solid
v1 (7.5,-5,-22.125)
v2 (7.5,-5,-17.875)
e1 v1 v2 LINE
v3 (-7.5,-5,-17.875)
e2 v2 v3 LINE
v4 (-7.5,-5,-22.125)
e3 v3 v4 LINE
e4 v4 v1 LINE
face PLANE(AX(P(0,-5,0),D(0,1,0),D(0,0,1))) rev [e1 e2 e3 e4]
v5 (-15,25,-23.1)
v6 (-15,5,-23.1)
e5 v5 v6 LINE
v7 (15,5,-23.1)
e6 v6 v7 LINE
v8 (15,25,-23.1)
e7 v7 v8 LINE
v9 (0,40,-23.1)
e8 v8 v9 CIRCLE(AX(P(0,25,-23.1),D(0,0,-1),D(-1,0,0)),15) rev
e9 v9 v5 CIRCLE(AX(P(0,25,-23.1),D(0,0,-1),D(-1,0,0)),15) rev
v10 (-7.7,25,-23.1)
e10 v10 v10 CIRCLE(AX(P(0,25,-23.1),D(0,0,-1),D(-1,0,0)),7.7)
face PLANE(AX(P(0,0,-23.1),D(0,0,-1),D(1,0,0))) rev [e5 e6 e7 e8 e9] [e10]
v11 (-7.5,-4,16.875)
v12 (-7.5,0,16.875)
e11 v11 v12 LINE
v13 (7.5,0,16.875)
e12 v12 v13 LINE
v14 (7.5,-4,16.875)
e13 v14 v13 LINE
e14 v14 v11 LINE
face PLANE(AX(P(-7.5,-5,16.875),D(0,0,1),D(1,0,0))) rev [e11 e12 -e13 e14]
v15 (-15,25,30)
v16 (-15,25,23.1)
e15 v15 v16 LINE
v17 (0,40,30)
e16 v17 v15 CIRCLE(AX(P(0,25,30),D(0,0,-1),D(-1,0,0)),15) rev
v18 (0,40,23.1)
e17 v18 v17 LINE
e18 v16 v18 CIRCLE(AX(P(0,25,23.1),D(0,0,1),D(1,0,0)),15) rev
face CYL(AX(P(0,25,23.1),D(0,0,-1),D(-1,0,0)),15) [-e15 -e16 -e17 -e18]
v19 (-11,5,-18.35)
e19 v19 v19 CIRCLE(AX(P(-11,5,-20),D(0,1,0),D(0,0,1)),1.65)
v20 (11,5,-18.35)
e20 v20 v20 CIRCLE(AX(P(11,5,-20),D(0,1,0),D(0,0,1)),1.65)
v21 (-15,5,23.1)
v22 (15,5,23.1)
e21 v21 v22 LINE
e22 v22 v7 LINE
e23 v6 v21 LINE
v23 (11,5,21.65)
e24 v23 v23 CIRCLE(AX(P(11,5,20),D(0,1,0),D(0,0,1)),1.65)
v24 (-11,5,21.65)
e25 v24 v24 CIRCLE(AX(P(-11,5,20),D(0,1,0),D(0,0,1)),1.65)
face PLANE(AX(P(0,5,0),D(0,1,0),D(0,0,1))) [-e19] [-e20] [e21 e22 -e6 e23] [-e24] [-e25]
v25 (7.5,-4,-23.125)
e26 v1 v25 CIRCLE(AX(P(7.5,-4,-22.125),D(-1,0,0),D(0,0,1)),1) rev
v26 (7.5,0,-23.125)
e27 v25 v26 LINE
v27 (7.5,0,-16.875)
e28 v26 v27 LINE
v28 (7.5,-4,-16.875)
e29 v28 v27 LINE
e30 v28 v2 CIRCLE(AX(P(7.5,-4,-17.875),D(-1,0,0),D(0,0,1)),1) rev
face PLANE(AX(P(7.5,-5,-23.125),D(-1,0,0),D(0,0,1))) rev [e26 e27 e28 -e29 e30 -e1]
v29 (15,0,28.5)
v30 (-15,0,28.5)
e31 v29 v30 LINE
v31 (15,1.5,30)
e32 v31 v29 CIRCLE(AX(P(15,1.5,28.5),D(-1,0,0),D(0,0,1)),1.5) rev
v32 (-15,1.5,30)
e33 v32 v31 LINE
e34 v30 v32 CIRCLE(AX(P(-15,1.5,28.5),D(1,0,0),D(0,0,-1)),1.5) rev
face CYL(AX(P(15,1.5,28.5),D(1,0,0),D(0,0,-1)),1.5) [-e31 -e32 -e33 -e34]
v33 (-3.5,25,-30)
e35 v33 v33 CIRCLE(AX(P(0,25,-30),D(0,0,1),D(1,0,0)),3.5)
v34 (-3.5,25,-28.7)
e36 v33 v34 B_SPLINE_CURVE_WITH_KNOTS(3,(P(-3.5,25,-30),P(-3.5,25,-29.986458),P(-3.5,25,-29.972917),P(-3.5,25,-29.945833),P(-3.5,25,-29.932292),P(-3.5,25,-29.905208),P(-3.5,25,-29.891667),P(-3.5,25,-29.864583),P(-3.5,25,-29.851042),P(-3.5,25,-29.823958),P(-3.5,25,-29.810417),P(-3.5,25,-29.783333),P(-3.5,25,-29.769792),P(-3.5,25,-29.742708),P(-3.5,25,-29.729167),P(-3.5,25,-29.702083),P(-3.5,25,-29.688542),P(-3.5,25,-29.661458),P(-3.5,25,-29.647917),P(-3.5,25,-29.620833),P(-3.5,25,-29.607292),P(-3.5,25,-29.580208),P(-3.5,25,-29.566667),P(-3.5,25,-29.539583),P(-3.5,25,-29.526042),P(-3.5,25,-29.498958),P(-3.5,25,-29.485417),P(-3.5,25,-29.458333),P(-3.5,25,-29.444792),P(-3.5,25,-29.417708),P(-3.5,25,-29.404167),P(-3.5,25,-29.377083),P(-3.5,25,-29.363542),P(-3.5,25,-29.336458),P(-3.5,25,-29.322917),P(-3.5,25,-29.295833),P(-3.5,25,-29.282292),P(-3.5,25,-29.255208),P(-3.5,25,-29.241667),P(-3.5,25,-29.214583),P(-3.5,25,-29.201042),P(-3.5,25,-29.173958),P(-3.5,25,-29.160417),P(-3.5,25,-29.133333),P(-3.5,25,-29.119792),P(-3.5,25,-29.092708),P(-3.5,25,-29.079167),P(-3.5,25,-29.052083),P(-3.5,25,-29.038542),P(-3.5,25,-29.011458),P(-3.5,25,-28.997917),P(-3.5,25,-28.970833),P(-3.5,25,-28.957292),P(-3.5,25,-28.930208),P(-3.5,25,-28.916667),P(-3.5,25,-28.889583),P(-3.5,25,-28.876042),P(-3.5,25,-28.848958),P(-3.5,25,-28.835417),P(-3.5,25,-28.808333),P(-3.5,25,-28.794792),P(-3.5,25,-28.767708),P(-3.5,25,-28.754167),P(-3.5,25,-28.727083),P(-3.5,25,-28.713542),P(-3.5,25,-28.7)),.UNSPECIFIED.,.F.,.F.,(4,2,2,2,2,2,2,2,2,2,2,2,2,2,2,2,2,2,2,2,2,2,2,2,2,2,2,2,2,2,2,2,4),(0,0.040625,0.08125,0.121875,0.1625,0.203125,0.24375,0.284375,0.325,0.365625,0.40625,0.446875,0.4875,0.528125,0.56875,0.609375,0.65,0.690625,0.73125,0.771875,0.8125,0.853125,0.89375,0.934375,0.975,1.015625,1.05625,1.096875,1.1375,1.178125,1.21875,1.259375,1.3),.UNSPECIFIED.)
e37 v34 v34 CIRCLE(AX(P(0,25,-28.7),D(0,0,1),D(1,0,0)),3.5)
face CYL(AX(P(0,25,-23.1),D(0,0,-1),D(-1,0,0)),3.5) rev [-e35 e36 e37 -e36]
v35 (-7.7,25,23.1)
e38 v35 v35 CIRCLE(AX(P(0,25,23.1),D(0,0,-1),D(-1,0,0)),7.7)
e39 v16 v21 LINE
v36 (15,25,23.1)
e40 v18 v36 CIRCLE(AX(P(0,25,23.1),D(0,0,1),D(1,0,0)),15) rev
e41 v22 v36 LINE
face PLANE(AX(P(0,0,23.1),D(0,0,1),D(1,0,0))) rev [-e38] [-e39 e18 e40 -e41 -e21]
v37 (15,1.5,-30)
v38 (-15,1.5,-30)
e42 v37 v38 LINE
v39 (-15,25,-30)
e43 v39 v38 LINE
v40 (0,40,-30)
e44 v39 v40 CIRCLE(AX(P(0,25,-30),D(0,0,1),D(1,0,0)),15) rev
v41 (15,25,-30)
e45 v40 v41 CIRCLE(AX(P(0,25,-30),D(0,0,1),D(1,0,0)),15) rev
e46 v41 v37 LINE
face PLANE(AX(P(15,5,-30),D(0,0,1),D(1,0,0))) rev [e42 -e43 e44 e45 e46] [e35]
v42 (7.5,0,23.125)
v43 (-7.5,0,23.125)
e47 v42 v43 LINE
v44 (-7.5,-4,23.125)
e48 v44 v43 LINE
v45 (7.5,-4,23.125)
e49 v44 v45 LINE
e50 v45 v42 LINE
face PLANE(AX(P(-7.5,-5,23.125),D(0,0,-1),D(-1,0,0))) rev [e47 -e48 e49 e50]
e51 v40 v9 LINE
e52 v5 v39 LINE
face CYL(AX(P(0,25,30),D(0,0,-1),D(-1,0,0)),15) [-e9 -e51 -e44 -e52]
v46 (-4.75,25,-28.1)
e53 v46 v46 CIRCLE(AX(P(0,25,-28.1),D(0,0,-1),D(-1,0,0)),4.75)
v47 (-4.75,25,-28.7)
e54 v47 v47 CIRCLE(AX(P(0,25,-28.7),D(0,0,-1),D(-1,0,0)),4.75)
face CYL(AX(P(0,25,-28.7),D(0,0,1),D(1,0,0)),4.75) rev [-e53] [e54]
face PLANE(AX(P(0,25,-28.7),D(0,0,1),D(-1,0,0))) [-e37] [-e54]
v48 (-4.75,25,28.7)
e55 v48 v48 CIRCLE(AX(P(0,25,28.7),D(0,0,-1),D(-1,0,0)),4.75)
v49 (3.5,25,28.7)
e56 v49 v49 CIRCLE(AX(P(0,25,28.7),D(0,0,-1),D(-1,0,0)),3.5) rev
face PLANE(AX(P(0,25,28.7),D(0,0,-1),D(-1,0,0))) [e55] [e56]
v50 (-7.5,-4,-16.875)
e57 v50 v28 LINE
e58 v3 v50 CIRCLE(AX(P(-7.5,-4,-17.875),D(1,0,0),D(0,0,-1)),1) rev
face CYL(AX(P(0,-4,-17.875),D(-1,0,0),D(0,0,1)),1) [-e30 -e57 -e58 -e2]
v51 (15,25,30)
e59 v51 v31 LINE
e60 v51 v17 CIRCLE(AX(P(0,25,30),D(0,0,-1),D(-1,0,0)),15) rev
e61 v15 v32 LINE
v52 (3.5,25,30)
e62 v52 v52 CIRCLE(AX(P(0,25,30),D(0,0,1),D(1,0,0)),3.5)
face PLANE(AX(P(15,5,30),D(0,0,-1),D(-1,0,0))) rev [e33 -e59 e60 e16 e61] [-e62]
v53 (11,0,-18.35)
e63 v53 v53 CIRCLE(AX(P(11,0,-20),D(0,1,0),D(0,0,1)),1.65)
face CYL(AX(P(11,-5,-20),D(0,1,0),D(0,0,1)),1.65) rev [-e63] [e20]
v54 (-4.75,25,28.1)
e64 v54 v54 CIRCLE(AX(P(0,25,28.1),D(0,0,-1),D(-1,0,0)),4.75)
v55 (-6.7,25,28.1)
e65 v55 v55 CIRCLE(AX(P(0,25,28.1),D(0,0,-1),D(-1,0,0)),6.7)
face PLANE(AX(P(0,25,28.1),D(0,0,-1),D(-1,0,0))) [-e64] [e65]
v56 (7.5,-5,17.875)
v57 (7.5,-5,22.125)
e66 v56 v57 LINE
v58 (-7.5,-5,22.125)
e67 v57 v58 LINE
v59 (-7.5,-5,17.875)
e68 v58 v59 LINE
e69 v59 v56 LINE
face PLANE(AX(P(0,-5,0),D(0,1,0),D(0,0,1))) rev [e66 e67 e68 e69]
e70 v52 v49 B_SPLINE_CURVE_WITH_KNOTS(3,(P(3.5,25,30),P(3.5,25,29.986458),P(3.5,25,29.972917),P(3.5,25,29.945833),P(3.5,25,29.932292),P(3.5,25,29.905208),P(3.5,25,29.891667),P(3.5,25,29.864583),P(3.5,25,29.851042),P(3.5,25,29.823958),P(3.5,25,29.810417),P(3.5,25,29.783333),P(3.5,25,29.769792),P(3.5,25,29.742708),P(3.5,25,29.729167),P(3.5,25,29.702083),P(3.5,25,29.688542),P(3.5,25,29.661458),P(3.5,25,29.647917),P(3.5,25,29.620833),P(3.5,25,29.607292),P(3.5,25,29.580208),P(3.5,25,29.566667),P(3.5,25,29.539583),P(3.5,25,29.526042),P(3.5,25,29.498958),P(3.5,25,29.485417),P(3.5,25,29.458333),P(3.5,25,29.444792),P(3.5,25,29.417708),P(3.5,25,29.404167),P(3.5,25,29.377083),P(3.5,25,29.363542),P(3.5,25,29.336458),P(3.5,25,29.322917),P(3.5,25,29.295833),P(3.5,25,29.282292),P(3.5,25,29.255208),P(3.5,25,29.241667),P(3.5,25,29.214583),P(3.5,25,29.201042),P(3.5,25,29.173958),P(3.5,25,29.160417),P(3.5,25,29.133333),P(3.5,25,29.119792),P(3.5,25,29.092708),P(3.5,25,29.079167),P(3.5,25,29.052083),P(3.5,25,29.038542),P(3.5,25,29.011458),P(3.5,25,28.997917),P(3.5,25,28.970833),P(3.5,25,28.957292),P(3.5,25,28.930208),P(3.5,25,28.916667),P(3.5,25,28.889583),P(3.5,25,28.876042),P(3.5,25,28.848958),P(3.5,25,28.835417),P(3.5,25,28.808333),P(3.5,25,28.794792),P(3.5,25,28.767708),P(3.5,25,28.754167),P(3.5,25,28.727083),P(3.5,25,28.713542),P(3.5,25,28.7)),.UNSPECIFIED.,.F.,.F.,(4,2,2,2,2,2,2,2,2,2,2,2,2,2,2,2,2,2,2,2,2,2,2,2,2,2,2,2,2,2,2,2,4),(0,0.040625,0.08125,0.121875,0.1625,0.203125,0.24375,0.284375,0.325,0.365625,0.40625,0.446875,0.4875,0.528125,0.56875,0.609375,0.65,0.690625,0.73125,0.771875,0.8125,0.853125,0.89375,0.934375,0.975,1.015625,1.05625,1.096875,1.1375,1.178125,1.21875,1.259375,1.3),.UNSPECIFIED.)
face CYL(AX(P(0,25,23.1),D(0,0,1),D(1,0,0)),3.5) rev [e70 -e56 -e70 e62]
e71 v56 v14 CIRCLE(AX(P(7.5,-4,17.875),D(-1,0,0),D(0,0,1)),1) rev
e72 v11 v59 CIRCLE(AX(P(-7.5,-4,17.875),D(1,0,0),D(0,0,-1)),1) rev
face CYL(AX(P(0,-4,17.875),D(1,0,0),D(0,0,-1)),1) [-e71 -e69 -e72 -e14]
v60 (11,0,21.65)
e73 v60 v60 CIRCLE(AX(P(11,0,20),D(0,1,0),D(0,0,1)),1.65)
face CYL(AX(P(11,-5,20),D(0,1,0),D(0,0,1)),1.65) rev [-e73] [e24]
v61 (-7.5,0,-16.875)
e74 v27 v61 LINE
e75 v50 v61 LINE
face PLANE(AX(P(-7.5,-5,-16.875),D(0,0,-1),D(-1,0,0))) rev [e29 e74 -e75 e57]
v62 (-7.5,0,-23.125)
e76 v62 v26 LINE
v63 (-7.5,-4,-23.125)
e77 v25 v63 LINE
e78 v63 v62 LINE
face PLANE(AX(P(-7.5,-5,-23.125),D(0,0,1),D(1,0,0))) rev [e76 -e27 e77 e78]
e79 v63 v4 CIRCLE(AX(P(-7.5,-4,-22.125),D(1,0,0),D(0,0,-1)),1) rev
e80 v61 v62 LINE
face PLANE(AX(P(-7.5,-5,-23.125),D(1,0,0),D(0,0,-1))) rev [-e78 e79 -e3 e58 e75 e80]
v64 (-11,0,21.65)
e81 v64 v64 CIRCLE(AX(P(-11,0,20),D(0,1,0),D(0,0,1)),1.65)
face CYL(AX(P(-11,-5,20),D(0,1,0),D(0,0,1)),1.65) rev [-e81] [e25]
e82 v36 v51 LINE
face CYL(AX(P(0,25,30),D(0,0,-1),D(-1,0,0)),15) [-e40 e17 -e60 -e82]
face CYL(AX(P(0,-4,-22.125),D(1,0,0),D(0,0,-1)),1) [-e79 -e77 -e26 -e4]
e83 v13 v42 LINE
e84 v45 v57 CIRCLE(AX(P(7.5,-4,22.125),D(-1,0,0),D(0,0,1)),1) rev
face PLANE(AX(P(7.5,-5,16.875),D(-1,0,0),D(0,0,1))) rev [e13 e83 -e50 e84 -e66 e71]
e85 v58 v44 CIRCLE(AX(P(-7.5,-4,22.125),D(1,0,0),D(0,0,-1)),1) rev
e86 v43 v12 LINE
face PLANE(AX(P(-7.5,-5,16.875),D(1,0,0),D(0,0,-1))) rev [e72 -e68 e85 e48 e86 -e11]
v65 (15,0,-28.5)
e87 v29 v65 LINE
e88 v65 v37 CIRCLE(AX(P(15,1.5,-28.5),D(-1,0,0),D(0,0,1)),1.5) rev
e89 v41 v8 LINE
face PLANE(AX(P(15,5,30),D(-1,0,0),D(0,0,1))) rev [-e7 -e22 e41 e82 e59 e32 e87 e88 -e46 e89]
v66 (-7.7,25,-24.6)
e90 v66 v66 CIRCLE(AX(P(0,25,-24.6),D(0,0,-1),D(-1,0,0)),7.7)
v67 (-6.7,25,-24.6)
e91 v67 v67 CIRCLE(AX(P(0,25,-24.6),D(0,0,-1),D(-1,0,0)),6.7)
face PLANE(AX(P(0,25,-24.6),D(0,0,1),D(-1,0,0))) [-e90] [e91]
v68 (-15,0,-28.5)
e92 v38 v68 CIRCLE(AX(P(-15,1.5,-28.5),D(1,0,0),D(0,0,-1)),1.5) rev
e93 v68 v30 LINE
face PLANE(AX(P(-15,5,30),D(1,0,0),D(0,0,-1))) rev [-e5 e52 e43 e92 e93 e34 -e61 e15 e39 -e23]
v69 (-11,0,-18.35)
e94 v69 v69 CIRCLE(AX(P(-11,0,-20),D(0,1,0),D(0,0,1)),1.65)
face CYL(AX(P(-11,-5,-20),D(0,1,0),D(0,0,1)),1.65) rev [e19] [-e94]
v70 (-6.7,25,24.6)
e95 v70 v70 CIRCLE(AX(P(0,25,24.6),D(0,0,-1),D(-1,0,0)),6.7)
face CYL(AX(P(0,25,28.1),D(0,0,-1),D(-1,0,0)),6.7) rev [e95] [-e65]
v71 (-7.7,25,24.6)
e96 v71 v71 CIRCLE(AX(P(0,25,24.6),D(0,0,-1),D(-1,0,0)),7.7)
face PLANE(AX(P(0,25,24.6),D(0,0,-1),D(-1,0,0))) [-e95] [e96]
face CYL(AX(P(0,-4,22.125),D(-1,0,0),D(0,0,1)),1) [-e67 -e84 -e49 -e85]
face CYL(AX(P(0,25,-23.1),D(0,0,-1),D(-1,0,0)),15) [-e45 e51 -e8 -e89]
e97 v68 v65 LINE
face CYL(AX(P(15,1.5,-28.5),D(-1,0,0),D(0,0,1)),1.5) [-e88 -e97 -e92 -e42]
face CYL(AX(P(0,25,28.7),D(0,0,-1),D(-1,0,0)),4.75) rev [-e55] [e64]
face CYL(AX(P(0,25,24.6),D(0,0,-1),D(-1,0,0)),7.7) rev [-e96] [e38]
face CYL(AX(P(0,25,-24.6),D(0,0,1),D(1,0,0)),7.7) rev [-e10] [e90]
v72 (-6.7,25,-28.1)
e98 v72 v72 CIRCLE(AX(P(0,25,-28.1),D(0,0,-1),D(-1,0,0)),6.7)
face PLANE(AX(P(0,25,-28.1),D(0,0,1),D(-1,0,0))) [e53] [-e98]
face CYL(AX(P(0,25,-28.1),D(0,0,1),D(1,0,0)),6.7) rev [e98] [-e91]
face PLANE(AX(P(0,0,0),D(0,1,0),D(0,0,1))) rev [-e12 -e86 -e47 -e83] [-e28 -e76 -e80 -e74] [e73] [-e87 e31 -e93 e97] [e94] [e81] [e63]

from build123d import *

# Parameters (mm, degrees)
SKETCH1_W           = 30
SKETCH1_H           = 60
BOSS_EXTRUDE1_DEPTH = 5
SKETCH3_R           = 3.5
BOSS_EXTRUDE2_DEPTH = 6.9
SKETCH4_R           = 7.7
CUT_EXTRUDE1_DEPTH  = 1.5
SKETCH6_R           = 6.7
CUT_EXTRUDE2_DEPTH  = 3.5
SKETCH9_R           = 4.75
CUT_EXTRUDE4_DEPTH  = 0.6
FILLET1_R           = 15
SKETCH15_R          = 1.65
CUT_EXTRUDE5_DEPTH  = 10
SKETCH16_W          = 15
SKETCH16_H          = 6.25
BOSS_EXTRUDE3_DEPTH = 5
FILLET2_R           = 1.5
FILLET3_R           = 1


with BuildPart() as part:
    # Sketch1 → Boss-Extrude1 (new body)
    with BuildSketch(Plane(origin=(0, 0, 0), x_dir=(1, 0, 0), z_dir=(0, 1, 0))):
        Rectangle(SKETCH1_W, SKETCH1_H)
    extrude(amount=BOSS_EXTRUDE1_DEPTH)

    # Sketch3 → Boss-Extrude2 (add)
    with BuildSketch(Plane.XY.offset(30)):
        Polygon((-15, 5), (15, 5), (15, 25), (15, 40), (-15, 40), (-15, 25), align=None)
        with Locations((0, 25)):
            Circle(SKETCH3_R, mode=Mode.SUBTRACT)
    boss_extrude2 = extrude(amount=-BOSS_EXTRUDE2_DEPTH)

    # Sketch4 → Cut-Extrude1 (cut)
    with BuildSketch(Plane(origin=(0, 0, 23.1), x_dir=(-1, 0, 0), z_dir=(0, 0, -1))):
        with Locations((0, 25)):
            Circle(SKETCH4_R)
    cut_extrude1 = extrude(amount=-CUT_EXTRUDE1_DEPTH, mode=Mode.SUBTRACT)

    # Sketch6 → Cut-Extrude2 (cut)
    with BuildSketch(Plane(origin=(0, 0, 24.6), x_dir=(-1, 0, 0), z_dir=(0, 0, -1))):
        with Locations((0, 25)):
            Circle(SKETCH6_R)
    cut_extrude2 = extrude(amount=-CUT_EXTRUDE2_DEPTH, mode=Mode.SUBTRACT)

    # Sketch9 → Cut-Extrude4 (cut)
    with BuildSketch(Plane(origin=(0, 0, 28.1), x_dir=(-1, 0, 0), z_dir=(0, 0, -1))):
        with Locations((0, 25)):
            Circle(SKETCH9_R)
    cut_extrude4 = extrude(amount=-CUT_EXTRUDE4_DEPTH, mode=Mode.SUBTRACT)

    # Mirror2: Boss-Extrude2, Cut-Extrude1, Cut-Extrude2, Cut-Extrude4 across plane
    add(boss_extrude2.mirror(Plane.XY))
    add(cut_extrude1.mirror(Plane.XY), mode=Mode.SUBTRACT)
    add(cut_extrude2.mirror(Plane.XY), mode=Mode.SUBTRACT)
    add(cut_extrude4.mirror(Plane.XY), mode=Mode.SUBTRACT)

    # Fillet1
    fillet1_edges = [part.edges().sort_by_distance(p)[0] for p in [
        (-15, 40, -26.55),
        (15, 40, -26.55),
        (-15, 40, 26.55),
        (15, 40, 26.55),
    ]]
    fillet(fillet1_edges, radius=FILLET1_R - 0.0001)  # a hair under: the kernel refuses the full size

    # Sketch15 → Cut-Extrude5 (cut)
    with BuildSketch(Plane(origin=(0, 5, 0), x_dir=(1, 0, 0), z_dir=(0, 1, 0))):
        with Locations(Location((-11, -20, 0), (0, 0, 270))):
            Circle(SKETCH15_R)
        with Locations(Location((11, -20, 0), (0, 0, 270))):
            Circle(SKETCH15_R)
        with Locations(Location((-11, 20, 0), (0, 0, 270))):
            Circle(SKETCH15_R)
        with Locations(Location((11, 20, 0), (0, 0, 270))):
            Circle(SKETCH15_R)
    extrude(amount=-CUT_EXTRUDE5_DEPTH, mode=Mode.SUBTRACT)

    # Sketch16 → Boss-Extrude3 (add)
    with BuildSketch(Plane.XZ):
        with Locations((0, 20)):
            Rectangle(SKETCH16_W, SKETCH16_H)
        with Locations((0, -20)):
            Rectangle(SKETCH16_W, SKETCH16_H)
    extrude(amount=BOSS_EXTRUDE3_DEPTH)

    # Fillet2
    fillet2_edges = [part.edges().sort_by_distance(p)[0] for p in [
        (0, 0, -30),
        (0, 0, 30),
    ]]
    fillet(fillet2_edges, radius=FILLET2_R)

    # Fillet3
    fillet3_edges = [part.edges().sort_by_distance(p)[0] for p in [
        (0, -5, 23.125),
        (0, -5, 16.875),
        (0, -5, -16.875),
        (0, -5, -23.125),
    ]]
    fillet(fillet3_edges, radius=FILLET3_R)


solid = part.part
